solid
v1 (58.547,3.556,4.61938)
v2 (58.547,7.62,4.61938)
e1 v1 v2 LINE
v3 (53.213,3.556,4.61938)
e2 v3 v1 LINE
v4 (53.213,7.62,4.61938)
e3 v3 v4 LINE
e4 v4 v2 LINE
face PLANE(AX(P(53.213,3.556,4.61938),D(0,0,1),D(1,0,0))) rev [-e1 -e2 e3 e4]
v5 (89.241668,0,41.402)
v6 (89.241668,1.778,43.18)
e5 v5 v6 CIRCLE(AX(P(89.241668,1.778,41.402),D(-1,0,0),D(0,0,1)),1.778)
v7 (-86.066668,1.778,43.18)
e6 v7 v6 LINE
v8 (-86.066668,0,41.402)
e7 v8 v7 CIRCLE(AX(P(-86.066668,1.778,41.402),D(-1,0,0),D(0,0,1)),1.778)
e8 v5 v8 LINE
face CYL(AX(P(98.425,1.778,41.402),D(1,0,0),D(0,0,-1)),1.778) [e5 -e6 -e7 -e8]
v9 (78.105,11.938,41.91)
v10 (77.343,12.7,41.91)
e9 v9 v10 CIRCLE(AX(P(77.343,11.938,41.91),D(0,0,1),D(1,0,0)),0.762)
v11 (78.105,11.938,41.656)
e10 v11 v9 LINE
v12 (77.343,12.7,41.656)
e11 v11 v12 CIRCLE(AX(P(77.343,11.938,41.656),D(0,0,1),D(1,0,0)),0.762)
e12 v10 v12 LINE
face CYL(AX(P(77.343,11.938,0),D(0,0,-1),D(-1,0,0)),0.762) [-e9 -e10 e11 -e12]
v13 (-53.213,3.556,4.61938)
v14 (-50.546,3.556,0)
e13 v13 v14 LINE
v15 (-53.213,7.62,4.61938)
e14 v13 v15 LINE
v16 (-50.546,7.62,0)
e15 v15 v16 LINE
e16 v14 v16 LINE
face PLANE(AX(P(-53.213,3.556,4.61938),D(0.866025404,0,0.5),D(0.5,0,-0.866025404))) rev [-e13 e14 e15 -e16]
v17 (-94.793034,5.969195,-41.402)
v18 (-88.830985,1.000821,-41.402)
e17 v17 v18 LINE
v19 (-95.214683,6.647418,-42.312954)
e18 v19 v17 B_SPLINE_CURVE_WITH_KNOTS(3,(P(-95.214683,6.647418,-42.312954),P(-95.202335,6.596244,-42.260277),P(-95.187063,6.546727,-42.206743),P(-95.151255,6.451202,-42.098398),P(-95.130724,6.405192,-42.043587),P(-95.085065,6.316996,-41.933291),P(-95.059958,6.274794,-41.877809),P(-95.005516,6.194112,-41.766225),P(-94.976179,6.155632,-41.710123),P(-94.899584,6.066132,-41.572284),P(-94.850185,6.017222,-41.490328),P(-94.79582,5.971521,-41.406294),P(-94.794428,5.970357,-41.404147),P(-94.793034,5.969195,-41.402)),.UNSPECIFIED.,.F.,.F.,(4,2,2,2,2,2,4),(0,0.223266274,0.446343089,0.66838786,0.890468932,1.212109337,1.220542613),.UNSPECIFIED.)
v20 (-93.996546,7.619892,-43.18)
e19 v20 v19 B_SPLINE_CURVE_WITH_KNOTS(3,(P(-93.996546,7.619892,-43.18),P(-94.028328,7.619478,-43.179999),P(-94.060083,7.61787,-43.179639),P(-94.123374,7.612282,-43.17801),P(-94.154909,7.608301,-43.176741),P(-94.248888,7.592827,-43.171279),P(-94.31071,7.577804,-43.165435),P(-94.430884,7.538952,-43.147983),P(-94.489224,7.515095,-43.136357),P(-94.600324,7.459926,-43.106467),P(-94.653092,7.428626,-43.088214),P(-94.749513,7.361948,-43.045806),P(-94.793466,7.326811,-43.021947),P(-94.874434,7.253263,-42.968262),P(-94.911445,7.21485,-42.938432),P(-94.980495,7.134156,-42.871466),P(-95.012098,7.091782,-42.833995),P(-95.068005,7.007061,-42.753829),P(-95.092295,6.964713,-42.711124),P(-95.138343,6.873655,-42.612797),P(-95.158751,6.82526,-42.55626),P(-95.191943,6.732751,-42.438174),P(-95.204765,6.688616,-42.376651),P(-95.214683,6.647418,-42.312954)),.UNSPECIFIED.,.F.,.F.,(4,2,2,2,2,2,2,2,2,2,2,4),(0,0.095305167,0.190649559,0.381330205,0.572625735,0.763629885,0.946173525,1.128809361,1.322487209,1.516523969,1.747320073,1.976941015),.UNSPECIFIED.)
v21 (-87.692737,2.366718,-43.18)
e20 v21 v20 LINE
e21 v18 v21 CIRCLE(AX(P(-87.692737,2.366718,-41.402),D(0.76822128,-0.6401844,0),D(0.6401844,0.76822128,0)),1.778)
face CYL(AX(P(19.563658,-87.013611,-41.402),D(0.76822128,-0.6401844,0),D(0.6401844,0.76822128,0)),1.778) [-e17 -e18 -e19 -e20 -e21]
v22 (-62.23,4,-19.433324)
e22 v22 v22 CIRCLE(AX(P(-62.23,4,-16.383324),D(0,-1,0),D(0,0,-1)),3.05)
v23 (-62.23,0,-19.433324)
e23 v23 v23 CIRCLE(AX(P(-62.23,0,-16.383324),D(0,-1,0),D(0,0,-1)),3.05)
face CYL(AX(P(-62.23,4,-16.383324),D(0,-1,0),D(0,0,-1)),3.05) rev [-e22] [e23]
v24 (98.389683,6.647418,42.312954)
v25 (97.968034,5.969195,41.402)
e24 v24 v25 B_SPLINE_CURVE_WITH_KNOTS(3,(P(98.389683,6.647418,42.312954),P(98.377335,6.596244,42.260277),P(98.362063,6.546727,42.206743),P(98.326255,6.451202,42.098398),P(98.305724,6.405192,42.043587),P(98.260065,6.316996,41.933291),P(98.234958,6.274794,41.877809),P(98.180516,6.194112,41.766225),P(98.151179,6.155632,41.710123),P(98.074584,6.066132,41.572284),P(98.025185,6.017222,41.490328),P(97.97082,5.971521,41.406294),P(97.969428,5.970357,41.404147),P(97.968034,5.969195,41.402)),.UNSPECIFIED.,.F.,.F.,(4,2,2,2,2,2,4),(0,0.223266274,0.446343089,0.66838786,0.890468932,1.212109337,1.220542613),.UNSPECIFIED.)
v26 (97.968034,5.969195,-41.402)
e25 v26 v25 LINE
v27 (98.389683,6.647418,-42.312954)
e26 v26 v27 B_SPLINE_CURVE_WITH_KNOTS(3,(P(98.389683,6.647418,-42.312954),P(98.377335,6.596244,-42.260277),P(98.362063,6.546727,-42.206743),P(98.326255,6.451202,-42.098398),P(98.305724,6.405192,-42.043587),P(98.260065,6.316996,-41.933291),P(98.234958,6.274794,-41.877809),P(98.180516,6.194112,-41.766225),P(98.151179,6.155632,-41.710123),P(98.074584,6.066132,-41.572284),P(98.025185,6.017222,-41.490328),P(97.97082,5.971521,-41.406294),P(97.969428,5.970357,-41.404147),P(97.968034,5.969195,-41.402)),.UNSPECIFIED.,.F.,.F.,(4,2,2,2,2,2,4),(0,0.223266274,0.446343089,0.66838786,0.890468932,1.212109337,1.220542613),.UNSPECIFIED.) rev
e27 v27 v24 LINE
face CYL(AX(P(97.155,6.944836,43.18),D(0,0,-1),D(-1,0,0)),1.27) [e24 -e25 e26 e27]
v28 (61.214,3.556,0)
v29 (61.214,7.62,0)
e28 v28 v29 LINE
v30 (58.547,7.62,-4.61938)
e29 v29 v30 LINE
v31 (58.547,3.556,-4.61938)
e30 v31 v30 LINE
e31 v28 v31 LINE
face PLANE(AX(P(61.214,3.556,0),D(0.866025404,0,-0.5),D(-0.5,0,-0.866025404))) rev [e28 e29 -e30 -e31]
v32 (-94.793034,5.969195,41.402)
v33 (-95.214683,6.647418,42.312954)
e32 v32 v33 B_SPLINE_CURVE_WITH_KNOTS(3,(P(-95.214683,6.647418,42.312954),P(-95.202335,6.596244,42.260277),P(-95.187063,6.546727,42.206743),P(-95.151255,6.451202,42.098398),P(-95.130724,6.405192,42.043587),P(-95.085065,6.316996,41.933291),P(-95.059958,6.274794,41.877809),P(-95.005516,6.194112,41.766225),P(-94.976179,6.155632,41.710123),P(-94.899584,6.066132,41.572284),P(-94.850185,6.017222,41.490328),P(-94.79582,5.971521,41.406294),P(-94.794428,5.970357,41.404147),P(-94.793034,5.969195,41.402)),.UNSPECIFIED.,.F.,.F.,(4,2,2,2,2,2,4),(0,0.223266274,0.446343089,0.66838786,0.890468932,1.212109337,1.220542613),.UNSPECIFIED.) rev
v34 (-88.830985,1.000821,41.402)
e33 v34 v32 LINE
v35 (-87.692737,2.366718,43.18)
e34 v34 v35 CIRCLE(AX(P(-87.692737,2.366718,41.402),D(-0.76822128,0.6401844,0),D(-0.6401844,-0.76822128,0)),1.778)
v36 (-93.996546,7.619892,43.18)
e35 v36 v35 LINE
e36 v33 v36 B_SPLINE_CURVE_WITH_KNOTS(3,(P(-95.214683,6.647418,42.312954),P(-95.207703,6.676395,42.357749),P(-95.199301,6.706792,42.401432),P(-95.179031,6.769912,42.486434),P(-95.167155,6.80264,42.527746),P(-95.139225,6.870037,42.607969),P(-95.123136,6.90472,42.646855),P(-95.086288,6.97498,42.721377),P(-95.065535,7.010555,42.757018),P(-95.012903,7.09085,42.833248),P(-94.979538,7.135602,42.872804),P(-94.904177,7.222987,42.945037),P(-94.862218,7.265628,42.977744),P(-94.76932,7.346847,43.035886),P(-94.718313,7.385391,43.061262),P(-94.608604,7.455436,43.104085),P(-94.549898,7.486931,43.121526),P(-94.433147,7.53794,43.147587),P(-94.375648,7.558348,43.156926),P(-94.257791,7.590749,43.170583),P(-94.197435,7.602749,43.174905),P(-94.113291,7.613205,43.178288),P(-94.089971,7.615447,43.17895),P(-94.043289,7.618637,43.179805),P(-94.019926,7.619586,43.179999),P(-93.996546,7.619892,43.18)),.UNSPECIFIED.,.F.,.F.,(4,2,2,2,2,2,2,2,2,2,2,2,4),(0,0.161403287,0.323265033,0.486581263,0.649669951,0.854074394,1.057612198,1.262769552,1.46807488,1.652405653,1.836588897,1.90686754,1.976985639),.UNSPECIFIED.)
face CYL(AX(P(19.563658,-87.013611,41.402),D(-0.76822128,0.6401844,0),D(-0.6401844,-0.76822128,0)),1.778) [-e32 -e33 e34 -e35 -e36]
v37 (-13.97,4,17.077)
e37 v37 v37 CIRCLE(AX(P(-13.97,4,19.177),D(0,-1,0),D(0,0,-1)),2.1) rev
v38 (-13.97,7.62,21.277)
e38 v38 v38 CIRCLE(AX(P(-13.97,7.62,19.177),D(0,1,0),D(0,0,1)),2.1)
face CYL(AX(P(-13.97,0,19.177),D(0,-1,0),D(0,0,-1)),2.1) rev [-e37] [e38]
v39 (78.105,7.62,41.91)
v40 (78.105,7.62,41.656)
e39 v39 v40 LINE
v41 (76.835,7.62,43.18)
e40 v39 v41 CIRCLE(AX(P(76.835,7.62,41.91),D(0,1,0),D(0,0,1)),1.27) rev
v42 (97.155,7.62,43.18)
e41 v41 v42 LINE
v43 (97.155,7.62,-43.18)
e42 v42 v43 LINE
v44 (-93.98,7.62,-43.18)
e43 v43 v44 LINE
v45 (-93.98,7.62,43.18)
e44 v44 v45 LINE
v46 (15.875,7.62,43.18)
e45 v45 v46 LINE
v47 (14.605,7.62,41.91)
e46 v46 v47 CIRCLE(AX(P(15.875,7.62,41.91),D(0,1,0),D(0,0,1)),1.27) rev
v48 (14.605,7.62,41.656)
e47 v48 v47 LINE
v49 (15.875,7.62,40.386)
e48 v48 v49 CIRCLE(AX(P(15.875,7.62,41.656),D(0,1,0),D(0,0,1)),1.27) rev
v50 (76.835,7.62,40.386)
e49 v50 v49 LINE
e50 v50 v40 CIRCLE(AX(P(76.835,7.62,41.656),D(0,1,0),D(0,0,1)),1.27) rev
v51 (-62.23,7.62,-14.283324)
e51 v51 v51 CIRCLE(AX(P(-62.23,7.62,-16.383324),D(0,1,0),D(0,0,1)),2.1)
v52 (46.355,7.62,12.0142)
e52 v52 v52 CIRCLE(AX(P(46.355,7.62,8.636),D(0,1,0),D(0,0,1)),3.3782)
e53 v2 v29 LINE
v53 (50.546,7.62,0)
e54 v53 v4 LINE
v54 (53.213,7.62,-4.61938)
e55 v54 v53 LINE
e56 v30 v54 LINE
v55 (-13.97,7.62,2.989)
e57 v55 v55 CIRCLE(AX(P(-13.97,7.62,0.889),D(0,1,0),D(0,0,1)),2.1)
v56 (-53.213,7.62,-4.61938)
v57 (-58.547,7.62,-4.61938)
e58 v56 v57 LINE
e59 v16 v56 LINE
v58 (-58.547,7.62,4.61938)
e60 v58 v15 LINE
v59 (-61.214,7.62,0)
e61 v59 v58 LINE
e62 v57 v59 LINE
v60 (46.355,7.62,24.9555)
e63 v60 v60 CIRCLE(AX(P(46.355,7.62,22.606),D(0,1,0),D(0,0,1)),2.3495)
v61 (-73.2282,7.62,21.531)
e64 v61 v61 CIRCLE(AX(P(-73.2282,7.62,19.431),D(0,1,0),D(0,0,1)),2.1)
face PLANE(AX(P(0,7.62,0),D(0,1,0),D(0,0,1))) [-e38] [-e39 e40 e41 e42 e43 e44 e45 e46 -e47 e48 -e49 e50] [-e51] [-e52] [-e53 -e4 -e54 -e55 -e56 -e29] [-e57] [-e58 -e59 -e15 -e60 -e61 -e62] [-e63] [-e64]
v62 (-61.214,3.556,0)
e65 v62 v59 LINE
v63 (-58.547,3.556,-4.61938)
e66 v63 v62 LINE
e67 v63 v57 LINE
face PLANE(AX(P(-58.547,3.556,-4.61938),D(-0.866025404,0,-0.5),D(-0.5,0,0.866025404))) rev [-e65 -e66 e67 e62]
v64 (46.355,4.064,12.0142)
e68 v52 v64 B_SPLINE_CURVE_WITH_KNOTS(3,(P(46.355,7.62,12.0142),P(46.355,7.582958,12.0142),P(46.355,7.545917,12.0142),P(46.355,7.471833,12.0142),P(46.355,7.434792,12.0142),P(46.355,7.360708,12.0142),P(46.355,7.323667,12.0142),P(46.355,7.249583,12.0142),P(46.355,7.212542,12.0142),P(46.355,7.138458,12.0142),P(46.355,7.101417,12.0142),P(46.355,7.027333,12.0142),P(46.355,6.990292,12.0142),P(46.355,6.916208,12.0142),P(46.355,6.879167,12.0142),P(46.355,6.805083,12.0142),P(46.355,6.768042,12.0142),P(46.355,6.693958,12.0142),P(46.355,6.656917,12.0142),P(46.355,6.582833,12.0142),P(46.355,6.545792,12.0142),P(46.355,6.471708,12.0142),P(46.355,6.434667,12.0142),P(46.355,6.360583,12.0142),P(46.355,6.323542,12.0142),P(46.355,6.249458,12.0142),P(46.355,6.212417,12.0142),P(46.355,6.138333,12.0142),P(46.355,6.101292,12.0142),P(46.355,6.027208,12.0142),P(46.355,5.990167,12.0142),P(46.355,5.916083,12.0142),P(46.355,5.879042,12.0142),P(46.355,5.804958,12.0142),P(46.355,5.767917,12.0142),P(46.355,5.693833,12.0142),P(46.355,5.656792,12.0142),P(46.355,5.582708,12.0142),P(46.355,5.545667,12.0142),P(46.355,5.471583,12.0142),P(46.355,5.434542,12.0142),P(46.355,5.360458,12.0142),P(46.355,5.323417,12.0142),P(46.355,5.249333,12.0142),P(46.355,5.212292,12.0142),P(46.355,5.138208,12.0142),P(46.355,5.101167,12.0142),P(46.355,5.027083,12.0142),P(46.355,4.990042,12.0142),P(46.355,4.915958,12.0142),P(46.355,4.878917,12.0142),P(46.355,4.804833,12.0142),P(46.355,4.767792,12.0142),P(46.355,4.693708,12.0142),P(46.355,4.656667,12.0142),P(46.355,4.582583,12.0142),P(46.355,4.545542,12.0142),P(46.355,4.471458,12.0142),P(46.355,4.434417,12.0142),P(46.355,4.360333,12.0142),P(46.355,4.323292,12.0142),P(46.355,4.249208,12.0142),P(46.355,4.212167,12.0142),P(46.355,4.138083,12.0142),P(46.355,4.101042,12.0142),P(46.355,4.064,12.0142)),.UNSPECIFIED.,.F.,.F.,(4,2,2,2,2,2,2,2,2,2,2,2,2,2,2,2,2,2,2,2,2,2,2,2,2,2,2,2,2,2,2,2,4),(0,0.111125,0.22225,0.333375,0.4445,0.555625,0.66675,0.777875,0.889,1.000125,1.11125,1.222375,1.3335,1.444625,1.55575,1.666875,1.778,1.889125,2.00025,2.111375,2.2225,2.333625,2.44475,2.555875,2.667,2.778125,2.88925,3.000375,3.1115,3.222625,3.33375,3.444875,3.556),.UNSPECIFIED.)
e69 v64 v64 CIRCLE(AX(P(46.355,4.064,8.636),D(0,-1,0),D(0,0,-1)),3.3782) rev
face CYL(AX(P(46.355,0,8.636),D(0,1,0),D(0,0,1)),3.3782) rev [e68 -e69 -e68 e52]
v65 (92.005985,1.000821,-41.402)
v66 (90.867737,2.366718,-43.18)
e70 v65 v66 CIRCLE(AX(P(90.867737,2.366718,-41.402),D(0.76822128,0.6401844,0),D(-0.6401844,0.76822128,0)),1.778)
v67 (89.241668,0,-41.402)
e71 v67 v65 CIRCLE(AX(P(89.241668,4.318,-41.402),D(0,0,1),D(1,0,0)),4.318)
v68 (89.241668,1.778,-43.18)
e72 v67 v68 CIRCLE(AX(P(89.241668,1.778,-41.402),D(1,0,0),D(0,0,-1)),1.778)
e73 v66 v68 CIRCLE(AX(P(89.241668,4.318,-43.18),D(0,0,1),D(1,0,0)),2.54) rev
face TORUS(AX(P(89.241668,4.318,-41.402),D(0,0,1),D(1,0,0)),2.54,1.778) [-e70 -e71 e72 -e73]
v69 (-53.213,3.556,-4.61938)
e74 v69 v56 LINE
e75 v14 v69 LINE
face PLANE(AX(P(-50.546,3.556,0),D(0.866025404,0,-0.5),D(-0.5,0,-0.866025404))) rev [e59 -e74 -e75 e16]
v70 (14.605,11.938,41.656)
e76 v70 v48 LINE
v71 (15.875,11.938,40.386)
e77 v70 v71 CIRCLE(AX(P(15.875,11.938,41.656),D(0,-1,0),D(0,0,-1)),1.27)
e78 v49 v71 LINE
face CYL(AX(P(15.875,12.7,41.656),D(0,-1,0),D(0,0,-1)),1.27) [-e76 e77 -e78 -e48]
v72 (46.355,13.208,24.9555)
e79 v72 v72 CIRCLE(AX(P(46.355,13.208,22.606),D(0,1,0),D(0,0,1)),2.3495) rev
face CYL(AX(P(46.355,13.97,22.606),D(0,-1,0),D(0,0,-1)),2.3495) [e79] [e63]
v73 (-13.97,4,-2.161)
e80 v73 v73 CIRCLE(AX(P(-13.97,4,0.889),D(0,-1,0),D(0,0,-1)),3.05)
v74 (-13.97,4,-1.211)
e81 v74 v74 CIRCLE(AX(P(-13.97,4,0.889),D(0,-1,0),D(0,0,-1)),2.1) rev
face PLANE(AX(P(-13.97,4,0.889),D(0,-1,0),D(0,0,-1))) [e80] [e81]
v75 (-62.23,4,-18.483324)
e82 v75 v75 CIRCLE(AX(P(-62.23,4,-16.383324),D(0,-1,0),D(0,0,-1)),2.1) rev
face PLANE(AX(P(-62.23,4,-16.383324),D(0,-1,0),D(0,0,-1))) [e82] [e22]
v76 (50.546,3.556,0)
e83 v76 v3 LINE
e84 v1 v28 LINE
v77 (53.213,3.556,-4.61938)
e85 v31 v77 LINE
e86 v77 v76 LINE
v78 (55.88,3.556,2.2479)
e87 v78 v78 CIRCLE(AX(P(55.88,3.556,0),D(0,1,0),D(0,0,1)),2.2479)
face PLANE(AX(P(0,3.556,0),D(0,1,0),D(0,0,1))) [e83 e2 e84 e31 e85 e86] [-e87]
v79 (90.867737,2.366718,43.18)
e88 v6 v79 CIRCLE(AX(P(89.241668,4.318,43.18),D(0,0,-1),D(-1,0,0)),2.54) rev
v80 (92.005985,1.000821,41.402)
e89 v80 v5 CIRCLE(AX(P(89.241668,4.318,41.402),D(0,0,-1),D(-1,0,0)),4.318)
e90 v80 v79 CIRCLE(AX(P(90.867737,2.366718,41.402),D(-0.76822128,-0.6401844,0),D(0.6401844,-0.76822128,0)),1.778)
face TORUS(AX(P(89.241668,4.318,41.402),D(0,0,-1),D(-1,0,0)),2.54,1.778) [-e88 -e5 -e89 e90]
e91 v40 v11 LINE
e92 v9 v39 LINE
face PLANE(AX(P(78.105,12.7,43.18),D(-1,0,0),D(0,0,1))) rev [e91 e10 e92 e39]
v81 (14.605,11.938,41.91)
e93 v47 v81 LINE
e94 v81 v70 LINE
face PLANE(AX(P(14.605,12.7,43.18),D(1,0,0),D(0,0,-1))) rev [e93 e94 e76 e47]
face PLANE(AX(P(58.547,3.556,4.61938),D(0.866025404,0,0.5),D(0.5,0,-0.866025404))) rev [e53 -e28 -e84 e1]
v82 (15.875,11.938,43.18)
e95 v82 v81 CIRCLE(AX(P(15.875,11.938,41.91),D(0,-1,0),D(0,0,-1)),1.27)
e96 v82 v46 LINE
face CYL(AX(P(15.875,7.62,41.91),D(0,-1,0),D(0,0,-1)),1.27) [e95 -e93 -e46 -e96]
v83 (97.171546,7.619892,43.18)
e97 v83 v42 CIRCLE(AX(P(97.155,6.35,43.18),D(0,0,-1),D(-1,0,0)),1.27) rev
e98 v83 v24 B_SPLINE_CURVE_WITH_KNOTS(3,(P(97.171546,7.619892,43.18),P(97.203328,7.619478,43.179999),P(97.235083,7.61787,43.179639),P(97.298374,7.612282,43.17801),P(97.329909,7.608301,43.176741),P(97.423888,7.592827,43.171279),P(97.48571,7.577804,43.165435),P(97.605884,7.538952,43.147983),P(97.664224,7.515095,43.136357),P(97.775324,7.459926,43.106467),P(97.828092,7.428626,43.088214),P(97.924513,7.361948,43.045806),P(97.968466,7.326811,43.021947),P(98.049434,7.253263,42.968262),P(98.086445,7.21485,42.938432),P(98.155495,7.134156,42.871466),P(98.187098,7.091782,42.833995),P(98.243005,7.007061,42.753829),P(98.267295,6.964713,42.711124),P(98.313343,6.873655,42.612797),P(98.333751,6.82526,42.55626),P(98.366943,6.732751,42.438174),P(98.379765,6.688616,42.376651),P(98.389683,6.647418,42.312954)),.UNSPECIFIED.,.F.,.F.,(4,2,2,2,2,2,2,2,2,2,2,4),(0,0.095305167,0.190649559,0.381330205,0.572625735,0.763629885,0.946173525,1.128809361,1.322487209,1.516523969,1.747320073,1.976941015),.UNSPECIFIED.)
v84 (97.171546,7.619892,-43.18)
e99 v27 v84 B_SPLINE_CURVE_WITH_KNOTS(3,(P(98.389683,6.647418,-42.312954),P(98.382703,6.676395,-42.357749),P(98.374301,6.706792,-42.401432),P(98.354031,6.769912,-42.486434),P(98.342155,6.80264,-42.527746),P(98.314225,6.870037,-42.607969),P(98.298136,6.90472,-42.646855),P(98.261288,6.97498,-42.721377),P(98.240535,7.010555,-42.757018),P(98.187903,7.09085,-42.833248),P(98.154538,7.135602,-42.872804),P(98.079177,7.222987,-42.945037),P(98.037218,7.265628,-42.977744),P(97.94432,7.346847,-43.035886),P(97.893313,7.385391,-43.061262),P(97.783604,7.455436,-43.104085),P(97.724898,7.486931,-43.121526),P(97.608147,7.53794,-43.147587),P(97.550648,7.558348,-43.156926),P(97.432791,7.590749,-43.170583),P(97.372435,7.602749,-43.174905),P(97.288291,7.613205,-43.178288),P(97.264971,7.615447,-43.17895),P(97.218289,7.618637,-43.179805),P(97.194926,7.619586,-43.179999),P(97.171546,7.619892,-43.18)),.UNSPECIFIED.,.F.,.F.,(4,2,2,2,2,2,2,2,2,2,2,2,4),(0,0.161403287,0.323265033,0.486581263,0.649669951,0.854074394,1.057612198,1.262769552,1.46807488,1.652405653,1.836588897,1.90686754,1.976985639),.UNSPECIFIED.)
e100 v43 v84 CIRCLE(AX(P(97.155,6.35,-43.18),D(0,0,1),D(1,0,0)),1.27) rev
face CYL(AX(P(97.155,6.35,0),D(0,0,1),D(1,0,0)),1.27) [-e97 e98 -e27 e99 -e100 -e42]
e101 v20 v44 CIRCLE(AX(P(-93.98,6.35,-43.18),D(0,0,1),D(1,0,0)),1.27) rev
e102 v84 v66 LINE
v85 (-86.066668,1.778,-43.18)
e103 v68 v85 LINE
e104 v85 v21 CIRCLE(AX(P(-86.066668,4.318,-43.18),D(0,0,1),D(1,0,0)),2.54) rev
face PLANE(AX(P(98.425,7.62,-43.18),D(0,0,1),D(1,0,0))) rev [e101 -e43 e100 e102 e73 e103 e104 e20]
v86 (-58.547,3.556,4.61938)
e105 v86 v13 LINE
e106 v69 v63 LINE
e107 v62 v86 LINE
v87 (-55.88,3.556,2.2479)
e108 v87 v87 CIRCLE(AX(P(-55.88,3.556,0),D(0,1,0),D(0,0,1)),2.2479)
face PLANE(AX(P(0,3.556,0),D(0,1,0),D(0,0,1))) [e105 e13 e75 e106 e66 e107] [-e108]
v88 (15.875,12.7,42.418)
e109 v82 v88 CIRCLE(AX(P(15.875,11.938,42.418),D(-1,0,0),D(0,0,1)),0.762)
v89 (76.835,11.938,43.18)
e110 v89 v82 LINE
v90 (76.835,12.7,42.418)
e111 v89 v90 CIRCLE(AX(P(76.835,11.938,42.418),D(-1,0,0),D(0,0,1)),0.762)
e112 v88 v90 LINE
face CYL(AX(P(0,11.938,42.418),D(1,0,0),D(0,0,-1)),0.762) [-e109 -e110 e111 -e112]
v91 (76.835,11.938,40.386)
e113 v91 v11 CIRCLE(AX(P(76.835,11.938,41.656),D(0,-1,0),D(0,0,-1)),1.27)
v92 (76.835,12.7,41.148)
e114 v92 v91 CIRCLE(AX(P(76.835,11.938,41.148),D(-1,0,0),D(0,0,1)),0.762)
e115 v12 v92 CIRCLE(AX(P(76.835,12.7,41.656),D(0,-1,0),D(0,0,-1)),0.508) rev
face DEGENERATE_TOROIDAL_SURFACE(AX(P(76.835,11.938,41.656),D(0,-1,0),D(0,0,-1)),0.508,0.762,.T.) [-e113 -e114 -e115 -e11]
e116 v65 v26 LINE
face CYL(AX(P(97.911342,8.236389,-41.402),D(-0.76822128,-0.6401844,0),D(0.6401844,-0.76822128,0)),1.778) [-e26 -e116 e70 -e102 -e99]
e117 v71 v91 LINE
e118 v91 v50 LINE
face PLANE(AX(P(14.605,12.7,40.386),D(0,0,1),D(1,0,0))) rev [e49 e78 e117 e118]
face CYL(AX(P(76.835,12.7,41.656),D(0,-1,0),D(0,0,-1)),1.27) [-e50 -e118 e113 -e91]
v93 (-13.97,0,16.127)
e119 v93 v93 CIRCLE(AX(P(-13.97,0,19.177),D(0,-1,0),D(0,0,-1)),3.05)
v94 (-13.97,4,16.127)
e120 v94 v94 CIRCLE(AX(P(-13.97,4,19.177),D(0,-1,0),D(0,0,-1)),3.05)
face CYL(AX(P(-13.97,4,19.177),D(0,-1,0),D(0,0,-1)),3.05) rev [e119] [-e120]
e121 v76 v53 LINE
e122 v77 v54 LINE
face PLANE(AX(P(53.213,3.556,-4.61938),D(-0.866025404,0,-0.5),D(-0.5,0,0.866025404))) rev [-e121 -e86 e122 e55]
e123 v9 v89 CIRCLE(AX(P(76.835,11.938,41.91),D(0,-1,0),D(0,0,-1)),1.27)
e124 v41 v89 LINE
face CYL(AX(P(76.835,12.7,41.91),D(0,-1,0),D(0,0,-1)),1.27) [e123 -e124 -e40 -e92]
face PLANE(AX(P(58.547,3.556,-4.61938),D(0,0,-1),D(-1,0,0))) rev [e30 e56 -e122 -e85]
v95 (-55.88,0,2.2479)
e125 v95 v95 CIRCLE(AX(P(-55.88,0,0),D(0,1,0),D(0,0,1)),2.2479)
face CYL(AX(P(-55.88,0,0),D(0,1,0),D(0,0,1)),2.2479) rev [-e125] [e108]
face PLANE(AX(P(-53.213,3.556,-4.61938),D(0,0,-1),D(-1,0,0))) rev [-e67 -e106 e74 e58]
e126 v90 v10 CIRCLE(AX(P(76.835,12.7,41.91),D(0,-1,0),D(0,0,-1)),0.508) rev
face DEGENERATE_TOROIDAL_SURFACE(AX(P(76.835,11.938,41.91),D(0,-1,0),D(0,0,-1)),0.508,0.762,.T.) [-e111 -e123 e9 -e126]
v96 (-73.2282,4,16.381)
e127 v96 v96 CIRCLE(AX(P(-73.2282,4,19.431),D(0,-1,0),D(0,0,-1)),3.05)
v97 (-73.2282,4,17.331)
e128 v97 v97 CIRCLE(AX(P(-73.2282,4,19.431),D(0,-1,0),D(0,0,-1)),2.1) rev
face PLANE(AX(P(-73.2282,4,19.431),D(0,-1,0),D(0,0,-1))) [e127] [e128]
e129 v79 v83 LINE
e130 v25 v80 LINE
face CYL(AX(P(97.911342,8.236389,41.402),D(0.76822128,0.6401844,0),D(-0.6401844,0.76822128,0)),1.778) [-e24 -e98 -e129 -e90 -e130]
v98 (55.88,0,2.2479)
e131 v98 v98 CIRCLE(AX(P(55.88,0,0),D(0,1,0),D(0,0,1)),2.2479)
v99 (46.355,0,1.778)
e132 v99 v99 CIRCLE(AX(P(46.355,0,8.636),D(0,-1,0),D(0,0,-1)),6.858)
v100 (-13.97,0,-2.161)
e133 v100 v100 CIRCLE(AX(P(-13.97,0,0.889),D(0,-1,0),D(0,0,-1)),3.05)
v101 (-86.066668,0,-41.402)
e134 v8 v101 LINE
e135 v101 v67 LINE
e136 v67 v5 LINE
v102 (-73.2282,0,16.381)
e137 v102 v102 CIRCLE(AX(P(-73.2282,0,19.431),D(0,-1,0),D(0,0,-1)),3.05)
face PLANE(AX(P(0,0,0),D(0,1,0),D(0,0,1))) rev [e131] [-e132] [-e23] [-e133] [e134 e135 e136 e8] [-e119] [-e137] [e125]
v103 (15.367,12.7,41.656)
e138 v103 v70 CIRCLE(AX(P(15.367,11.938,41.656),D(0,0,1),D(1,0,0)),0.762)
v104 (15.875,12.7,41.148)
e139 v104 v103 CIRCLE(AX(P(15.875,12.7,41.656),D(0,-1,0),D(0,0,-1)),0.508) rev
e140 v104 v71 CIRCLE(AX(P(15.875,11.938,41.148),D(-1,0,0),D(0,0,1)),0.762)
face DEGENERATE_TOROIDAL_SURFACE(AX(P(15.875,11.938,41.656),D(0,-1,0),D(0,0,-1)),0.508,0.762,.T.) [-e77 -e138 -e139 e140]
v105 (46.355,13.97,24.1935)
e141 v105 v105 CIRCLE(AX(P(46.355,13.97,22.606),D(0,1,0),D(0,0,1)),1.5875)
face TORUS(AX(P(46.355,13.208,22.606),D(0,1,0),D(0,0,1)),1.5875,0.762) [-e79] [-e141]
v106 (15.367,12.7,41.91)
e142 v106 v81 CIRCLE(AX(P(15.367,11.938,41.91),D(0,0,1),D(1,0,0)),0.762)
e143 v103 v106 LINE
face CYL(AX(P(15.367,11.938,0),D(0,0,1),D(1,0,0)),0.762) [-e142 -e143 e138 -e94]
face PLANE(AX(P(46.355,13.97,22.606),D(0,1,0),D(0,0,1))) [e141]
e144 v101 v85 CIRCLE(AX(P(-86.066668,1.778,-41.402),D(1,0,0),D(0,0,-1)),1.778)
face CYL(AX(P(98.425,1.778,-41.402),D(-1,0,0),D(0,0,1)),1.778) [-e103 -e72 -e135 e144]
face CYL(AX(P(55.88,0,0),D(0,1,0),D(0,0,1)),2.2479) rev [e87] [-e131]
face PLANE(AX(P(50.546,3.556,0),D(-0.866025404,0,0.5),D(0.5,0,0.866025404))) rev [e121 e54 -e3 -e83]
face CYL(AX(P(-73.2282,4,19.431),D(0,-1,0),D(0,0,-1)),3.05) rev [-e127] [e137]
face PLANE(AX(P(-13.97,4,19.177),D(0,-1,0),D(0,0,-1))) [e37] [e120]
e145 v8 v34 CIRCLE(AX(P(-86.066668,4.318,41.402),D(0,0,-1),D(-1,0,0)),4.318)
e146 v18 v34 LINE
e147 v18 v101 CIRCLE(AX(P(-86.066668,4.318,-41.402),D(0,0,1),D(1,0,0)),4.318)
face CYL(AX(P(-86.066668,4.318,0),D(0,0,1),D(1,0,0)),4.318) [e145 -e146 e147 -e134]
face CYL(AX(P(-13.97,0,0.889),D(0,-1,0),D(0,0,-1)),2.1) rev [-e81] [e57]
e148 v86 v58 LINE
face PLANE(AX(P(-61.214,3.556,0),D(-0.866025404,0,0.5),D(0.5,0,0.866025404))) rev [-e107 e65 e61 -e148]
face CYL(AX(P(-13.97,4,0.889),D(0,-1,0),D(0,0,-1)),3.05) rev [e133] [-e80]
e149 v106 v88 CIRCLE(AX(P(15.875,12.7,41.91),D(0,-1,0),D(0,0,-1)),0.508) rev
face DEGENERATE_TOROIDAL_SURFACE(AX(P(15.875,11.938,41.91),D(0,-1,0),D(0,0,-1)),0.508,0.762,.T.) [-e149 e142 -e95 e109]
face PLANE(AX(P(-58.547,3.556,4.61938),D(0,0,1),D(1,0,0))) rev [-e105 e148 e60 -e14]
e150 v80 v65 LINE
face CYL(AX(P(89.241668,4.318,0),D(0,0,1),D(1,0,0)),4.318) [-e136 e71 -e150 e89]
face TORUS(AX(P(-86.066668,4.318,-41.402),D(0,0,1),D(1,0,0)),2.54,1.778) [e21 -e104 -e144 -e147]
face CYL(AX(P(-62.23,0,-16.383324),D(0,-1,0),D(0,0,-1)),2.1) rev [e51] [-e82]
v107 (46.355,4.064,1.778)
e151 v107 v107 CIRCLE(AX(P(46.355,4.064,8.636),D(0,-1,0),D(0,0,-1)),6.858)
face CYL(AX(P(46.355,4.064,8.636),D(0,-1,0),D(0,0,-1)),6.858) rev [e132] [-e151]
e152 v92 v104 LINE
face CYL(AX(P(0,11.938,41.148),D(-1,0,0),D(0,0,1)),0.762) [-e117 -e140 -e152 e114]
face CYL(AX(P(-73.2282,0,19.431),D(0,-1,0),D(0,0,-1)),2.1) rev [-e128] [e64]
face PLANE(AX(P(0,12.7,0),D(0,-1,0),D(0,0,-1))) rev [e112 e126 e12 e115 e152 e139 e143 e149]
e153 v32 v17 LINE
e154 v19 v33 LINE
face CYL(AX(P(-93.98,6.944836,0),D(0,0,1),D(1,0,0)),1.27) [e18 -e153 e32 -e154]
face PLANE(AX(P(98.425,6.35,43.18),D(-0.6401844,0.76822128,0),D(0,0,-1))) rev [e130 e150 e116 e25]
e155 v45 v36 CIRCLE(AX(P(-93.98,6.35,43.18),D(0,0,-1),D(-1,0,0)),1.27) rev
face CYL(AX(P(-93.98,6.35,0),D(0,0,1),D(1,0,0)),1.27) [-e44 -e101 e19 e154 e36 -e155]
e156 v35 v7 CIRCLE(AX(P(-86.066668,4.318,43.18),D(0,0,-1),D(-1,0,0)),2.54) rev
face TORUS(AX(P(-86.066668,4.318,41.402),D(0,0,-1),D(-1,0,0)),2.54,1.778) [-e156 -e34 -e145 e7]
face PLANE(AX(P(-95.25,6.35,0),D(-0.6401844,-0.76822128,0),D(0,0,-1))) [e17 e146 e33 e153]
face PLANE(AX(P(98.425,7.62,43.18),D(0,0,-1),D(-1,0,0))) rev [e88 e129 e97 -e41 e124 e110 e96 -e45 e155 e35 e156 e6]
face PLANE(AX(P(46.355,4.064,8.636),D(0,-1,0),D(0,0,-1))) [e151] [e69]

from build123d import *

# Parameters (mm, degrees)
SKETCH1_W            = 196.85
SKETCH1_H            = 86.36
BOSS_EXTRUDE1_DEPTH  = 7.62
SKETCH7_W            = 63.5
SKETCH7_H            = 2.794
BOSS_EXTRUDE3_DEPTH  = 5.08
FILLET1_R            = 1.27
SKETCH6_R            = 2.3495
BOSS_EXTRUDE4_DEPTH  = 6.35
CUT_EXTRUDE3_DEPTH   = 4.064
SKETCH15_R           = 2.2479
CUT_EXTRUDE4_DEPTH   = 108.983537731
SKETCH17_R           = 3.3782
CUT_EXTRUDE5_DEPTH   = 108.74997645
SKETCH19_R           = 6.858
CUT_EXTRUDE6_DEPTH   = 4.064
SKETCH20_W           = 119.676272879
SKETCH20_H           = 31.665859335
CUT_EXTRUDE7_DEPTH   = 3.175
M3_CLEARANCE_HOLE1_D = 4.2
SKETCH26_R           = 3.05
CUT_EXTRUDE8_DEPTH   = 4
CHAMFER1_SIZE        = 7.62
CHAMFER1_SIZE2       = 6.35
FILLET5_R            = 1.27
FILLET6_R            = 4.318
FILLET7_R            = 1.778
FILLET8_R            = 0.762


with BuildPart() as part:
    # Sketch1 → Boss-Extrude1 (new body)
    with BuildSketch(Plane(origin=(0, 0, 0), x_dir=(1, 0, 0), z_dir=(0, 1, 0))):
        Rectangle(SKETCH1_W, SKETCH1_H)
    extrude(amount=BOSS_EXTRUDE1_DEPTH)

    # Sketch7 → Boss-Extrude3 (add)
    with BuildSketch(Plane(origin=(0, 7.62, 0), x_dir=(1, 0, 0), z_dir=(0, 1, 0))):
        with Locations((46.355, -41.783)):
            Rectangle(SKETCH7_W, SKETCH7_H)
    extrude(amount=BOSS_EXTRUDE3_DEPTH)

    # Fillet1
    fillet1_edges = [part.edges().sort_by_distance(p)[0] for p in [
        (14.605, 10.16, 40.386),
        (14.605, 10.16, 43.18),
        (78.105, 10.16, 43.18),
        (78.105, 10.16, 40.386),
    ]]
    fillet(fillet1_edges, radius=FILLET1_R)

    # Sketch6 → Boss-Extrude4 (add)
    with BuildSketch(Plane(origin=(0, 7.62, 0), x_dir=(1, 0, 0), z_dir=(0, 1, 0))):
        with Locations(Location((46.355, -22.606, 0), (0, 0, 270))):
            Circle(SKETCH6_R)
    extrude(amount=BOSS_EXTRUDE4_DEPTH)

    # Sketch14 → Cut-Extrude3 (cut)
    with BuildSketch(Plane(origin=(0, 7.62, 0), x_dir=(1, 0, 0), z_dir=(0, 1, 0))):
        Polygon((-53.213, 4.619379504), (-58.547, 4.619379504), (-61.214, 0), (-58.547, -4.619379504), (-53.213, -4.619379504), (-50.546, 0), align=None)
        Polygon((61.214, 0), (58.547, 4.619379504), (53.213, 4.619379504), (50.546, 0), (53.213, -4.619379504), (58.547, -4.619379504), align=None)
    extrude(amount=-CUT_EXTRUDE3_DEPTH, mode=Mode.SUBTRACT)

    # Sketch15 → Cut-Extrude4 (cut, through all)
    with BuildSketch(Plane(origin=(0, 3.556, 0), x_dir=(1, 0, 0), z_dir=(0, 1, 0))):
        with Locations(Location((-55.88, 0, 0), (0, 0, 270))):
            Circle(SKETCH15_R)
        with Locations(Location((55.88, 0, 0), (0, 0, 270))):
            Circle(SKETCH15_R)
    extrude(amount=-CUT_EXTRUDE4_DEPTH, mode=Mode.SUBTRACT)

    # Sketch17 → Cut-Extrude5 (cut, through all)
    with BuildSketch(Plane(origin=(0, 7.62, 0), x_dir=(1, 0, 0), z_dir=(0, 1, 0))):
        with Locations(Location((46.355, -8.636, 0), (0, 0, 270))):
            Circle(SKETCH17_R)
    extrude(amount=-CUT_EXTRUDE5_DEPTH, mode=Mode.SUBTRACT)

    # Sketch19 → Cut-Extrude6 (cut)
    with BuildSketch(Plane.XZ):
        with Locations(Location((46.355, 8.636, 0), (0, 0, 270))):
            Circle(SKETCH19_R)
    extrude(amount=-CUT_EXTRUDE6_DEPTH, mode=Mode.SUBTRACT)

    # Sketch20 → Cut-Extrude7 (cut)
    with BuildSketch(Plane.ZY.offset(98.425)):
        with Locations((11.670595095, 4.377895417)):
            Rectangle(SKETCH20_W, SKETCH20_H)
    extrude(amount=-CUT_EXTRUDE7_DEPTH, mode=Mode.SUBTRACT)

    # M3 Clearance Hole1 (through all)
    with Locations(Plane(origin=(0, 0, 0), x_dir=(-1, 0, 0), z_dir=(0, -1, 0))):
        with Locations((13.97, -19.177), (13.97, -0.889), (73.2282, -19.431), (62.23, 16.383324254)):
            Hole(M3_CLEARANCE_HOLE1_D / 2)

    # Sketch26 → Cut-Extrude8 (cut)
    with BuildSketch(Plane.XZ):
        with Locations(Location((-73.2282, 19.431, 0), (0, 0, 270))):
            Circle(SKETCH26_R)
        with Locations(Location((-62.23, -16.383324254, 0), (0, 0, 270))):
            Circle(SKETCH26_R)
        with Locations(Location((-13.97, 0.889, 0), (0, 0, 270))):
            Circle(SKETCH26_R)
        with Locations(Location((-13.97, 19.177, 0), (0, 0, 270))):
            Circle(SKETCH26_R)
    extrude(amount=-CUT_EXTRUDE8_DEPTH, mode=Mode.SUBTRACT)

    # Chamfer1
    chamfer1_edges = [part.edges().sort_by_distance(p)[0] for p in [
        (-95.25, 0, 0),
        (98.425, 0, 0),
    ]]
    chamfer1_side = [part.faces().sort_by_distance(p)[0] for p in [
        (1.4899049, 0, -0.118781761),
    ]]
    chamfer(chamfer1_edges, length=CHAMFER1_SIZE, length2=CHAMFER1_SIZE2, reference=chamfer1_side[0])

    # Fillet5
    # the kernel refuses this fillet: 1.27 mm, written as the material it takes off along each edge
    with BuildSketch(Plane(origin=(-95.25, 7.62, -46.355), x_dir=(1, 0, 0), z_dir=(0, 0, 1)), Plane(origin=(98.425, 7.62, -46.355), x_dir=(0, -1, 0), z_dir=(0, 0, 1))) as fillet5_piece_1:
        with BuildLine():
            CenterArc((FILLET5_R, -FILLET5_R), FILLET5_R, 90, 90)
            Line((0, -FILLET5_R), (0, 0))
            Line((0, 0), (FILLET5_R, 0))
        make_face()
    extrude(amount=92.71, mode=Mode.SUBTRACT)
    with BuildSketch(Plane(origin=(-95.25, 6.35, -44.667090454), x_dir=(0.7682212795973746, -0.6401843996644814, 0), z_dir=(0, 0, 1)), Plane(origin=(98.425, 6.35, -44.667090454), x_dir=(0, 1, 0), z_dir=(0, 0, 1))) as fillet5_piece_2:
        with BuildLine():
            CenterArc((FILLET5_R * 0.468374945984, FILLET5_R), FILLET5_R, 219.805571092, 50.194428908)
            Line((-FILLET5_R * 0.299846333613, FILLET5_R * 0.359815600336), (0, 0))
            Line((0, 0), (FILLET5_R * 0.468374945984, 0))
        make_face()
    extrude(amount=89.334180907, mode=Mode.SUBTRACT)

    # Fillet6
    fillet6_edges = [part.edges().sort_by_distance(p)[0] for p in [
        (90.805, 0, 0),
        (-87.63, 0, 0),
    ]]
    fillet(fillet6_edges, radius=FILLET6_R)

    # Fillet7
    # the kernel refuses this fillet: 1.778 mm, written as the material it takes off along each edge
    with BuildSketch(Plane(origin=(-88.830984618, 1.000820515, 43.18), x_dir=(0.6401843996644796, 0.768221279597376, 0), z_dir=(-0.7682212795973761, 0.6401843996644797, 0)), Plane(origin=(-88.830984618, 1.000820515, -43.18), x_dir=(0, 0, 1), z_dir=(-0.7682212795973761, 0.6401843996644797, 0))) as fillet7_piece_1:
        with BuildLine():
            CenterArc((FILLET7_R, FILLET7_R), FILLET7_R, 180, 90)
            Line((0, FILLET7_R), (0, 0))
            Line((0, 0), (FILLET7_R, 0))
        make_face()
    extrude(amount=12.205849287, mode=Mode.SUBTRACT)
    with BuildSketch(Plane(origin=(-86.06666838, 4.318, 43.18), x_dir=(0, -1, 0), z_dir=(1, 0, 0))) as fillet7_piece_2:
        with BuildLine():
            CenterArc((4.318 - FILLET7_R, FILLET7_R), FILLET7_R, 270, 90)
            Line((4.318, FILLET7_R), (4.318, 0))
            Line((4.318, 0), (4.318 - FILLET7_R, 0))
        make_face()
    revolve(axis=Axis((-86.06666838, 4.318, 43.18), (0, 0, -1)), revolution_arc=39.805571092, mode=Mode.SUBTRACT)
    with BuildSketch(Plane(origin=(92.005984618, 1.000820515, 43.18), x_dir=(-0.6401843996644796, 0.768221279597376, 0), z_dir=(0.7682212795973761, 0.6401843996644797, 0)), Plane(origin=(92.005984618, 1.000820515, -43.18), x_dir=(0, 0, 1), z_dir=(0.7682212795973761, 0.6401843996644797, 0))) as fillet7_piece_3:
        with BuildLine():
            CenterArc((FILLET7_R, -FILLET7_R), FILLET7_R, 90, 90)
            Line((0, -FILLET7_R), (0, 0))
            Line((0, 0), (FILLET7_R, 0))
        make_face()
    extrude(amount=12.205849287, mode=Mode.SUBTRACT)
    with BuildSketch(Plane(origin=(89.24166838, 4.318, 43.18), x_dir=(0, -1, 0), z_dir=(-1, 0, 0))) as fillet7_piece_4:
        with BuildLine():
            CenterArc((4.318 - FILLET7_R, -FILLET7_R), FILLET7_R, 0, 90)
            Line((4.318, -FILLET7_R), (4.318, 0))
            Line((4.318, 0), (4.318 - FILLET7_R, 0))
        make_face()
    revolve(axis=Axis((89.24166838, 4.318, 43.18), (0, 0, 1)), revolution_arc=39.805571092, mode=Mode.SUBTRACT)
    with BuildSketch(Plane(origin=(89.24166838, 0, 43.18), x_dir=(0, 1, 0), z_dir=(-1, 0, 0))) as fillet7_piece_5:
        with BuildLine():
            CenterArc((FILLET7_R, FILLET7_R), FILLET7_R, 180, 90)
            Line((0, FILLET7_R), (0, 0))
            Line((0, 0), (FILLET7_R, 0))
        make_face()
    extrude(amount=175.30833676, mode=Mode.SUBTRACT)
    with BuildSketch(Plane(origin=(89.24166838, 4.318, -43.18), x_dir=(0, -1, 0), z_dir=(-1, 0, 0))) as fillet7_piece_6:
        with BuildLine():
            CenterArc((4.318 - FILLET7_R, FILLET7_R), FILLET7_R, 270, 90)
            Line((4.318 - FILLET7_R, 0), (4.318, 0))
            Line((4.318, 0), (4.318, FILLET7_R))
        make_face()
    revolve(axis=Axis((89.24166838, 4.318, -43.18), (0, 0, 1)), revolution_arc=39.805571092, mode=Mode.SUBTRACT)
    with BuildSketch(Plane(origin=(-86.06666838, 4.318, -43.18), x_dir=(0, -1, 0), z_dir=(1, 0, 0))) as fillet7_piece_7:
        with BuildLine():
            CenterArc((4.318 - FILLET7_R, -FILLET7_R), FILLET7_R, 0, 90)
            Line((4.318 - FILLET7_R, 0), (4.318, 0))
            Line((4.318, 0), (4.318, -FILLET7_R))
        make_face()
    revolve(axis=Axis((-86.06666838, 4.318, -43.18), (0, 0, -1)), revolution_arc=39.805571092, mode=Mode.SUBTRACT)
    with BuildSketch(Plane(origin=(-86.06666838, 0, -43.18), x_dir=(0, 0, 1), z_dir=(1, 0, 0))) as fillet7_piece_8:
        with BuildLine():
            CenterArc((FILLET7_R, -FILLET7_R), FILLET7_R, 90, 90)
            Line((0, -FILLET7_R), (0, 0))
            Line((0, 0), (FILLET7_R, 0))
        make_face()
    extrude(amount=175.30833676, mode=Mode.SUBTRACT)

    # Fillet8
    fillet8_edges = [part.edges().sort_by_distance(p)[0] for p in [
        (14.605, 12.7, 41.783),
        (46.355, 12.7, 40.386),
        (46.355, 12.7, 43.18),
        (78.105, 12.7, 41.783),
        (77.733025612, 12.7, 42.808025612),
        (77.733025612, 12.7, 40.757974388),
        (14.976974388, 12.7, 42.808025612),
        (14.976974388, 12.7, 40.757974388),
        (46.355, 13.97, 20.2565),
    ]]
    fillet(fillet8_edges, radius=FILLET8_R)


solid = part.part
